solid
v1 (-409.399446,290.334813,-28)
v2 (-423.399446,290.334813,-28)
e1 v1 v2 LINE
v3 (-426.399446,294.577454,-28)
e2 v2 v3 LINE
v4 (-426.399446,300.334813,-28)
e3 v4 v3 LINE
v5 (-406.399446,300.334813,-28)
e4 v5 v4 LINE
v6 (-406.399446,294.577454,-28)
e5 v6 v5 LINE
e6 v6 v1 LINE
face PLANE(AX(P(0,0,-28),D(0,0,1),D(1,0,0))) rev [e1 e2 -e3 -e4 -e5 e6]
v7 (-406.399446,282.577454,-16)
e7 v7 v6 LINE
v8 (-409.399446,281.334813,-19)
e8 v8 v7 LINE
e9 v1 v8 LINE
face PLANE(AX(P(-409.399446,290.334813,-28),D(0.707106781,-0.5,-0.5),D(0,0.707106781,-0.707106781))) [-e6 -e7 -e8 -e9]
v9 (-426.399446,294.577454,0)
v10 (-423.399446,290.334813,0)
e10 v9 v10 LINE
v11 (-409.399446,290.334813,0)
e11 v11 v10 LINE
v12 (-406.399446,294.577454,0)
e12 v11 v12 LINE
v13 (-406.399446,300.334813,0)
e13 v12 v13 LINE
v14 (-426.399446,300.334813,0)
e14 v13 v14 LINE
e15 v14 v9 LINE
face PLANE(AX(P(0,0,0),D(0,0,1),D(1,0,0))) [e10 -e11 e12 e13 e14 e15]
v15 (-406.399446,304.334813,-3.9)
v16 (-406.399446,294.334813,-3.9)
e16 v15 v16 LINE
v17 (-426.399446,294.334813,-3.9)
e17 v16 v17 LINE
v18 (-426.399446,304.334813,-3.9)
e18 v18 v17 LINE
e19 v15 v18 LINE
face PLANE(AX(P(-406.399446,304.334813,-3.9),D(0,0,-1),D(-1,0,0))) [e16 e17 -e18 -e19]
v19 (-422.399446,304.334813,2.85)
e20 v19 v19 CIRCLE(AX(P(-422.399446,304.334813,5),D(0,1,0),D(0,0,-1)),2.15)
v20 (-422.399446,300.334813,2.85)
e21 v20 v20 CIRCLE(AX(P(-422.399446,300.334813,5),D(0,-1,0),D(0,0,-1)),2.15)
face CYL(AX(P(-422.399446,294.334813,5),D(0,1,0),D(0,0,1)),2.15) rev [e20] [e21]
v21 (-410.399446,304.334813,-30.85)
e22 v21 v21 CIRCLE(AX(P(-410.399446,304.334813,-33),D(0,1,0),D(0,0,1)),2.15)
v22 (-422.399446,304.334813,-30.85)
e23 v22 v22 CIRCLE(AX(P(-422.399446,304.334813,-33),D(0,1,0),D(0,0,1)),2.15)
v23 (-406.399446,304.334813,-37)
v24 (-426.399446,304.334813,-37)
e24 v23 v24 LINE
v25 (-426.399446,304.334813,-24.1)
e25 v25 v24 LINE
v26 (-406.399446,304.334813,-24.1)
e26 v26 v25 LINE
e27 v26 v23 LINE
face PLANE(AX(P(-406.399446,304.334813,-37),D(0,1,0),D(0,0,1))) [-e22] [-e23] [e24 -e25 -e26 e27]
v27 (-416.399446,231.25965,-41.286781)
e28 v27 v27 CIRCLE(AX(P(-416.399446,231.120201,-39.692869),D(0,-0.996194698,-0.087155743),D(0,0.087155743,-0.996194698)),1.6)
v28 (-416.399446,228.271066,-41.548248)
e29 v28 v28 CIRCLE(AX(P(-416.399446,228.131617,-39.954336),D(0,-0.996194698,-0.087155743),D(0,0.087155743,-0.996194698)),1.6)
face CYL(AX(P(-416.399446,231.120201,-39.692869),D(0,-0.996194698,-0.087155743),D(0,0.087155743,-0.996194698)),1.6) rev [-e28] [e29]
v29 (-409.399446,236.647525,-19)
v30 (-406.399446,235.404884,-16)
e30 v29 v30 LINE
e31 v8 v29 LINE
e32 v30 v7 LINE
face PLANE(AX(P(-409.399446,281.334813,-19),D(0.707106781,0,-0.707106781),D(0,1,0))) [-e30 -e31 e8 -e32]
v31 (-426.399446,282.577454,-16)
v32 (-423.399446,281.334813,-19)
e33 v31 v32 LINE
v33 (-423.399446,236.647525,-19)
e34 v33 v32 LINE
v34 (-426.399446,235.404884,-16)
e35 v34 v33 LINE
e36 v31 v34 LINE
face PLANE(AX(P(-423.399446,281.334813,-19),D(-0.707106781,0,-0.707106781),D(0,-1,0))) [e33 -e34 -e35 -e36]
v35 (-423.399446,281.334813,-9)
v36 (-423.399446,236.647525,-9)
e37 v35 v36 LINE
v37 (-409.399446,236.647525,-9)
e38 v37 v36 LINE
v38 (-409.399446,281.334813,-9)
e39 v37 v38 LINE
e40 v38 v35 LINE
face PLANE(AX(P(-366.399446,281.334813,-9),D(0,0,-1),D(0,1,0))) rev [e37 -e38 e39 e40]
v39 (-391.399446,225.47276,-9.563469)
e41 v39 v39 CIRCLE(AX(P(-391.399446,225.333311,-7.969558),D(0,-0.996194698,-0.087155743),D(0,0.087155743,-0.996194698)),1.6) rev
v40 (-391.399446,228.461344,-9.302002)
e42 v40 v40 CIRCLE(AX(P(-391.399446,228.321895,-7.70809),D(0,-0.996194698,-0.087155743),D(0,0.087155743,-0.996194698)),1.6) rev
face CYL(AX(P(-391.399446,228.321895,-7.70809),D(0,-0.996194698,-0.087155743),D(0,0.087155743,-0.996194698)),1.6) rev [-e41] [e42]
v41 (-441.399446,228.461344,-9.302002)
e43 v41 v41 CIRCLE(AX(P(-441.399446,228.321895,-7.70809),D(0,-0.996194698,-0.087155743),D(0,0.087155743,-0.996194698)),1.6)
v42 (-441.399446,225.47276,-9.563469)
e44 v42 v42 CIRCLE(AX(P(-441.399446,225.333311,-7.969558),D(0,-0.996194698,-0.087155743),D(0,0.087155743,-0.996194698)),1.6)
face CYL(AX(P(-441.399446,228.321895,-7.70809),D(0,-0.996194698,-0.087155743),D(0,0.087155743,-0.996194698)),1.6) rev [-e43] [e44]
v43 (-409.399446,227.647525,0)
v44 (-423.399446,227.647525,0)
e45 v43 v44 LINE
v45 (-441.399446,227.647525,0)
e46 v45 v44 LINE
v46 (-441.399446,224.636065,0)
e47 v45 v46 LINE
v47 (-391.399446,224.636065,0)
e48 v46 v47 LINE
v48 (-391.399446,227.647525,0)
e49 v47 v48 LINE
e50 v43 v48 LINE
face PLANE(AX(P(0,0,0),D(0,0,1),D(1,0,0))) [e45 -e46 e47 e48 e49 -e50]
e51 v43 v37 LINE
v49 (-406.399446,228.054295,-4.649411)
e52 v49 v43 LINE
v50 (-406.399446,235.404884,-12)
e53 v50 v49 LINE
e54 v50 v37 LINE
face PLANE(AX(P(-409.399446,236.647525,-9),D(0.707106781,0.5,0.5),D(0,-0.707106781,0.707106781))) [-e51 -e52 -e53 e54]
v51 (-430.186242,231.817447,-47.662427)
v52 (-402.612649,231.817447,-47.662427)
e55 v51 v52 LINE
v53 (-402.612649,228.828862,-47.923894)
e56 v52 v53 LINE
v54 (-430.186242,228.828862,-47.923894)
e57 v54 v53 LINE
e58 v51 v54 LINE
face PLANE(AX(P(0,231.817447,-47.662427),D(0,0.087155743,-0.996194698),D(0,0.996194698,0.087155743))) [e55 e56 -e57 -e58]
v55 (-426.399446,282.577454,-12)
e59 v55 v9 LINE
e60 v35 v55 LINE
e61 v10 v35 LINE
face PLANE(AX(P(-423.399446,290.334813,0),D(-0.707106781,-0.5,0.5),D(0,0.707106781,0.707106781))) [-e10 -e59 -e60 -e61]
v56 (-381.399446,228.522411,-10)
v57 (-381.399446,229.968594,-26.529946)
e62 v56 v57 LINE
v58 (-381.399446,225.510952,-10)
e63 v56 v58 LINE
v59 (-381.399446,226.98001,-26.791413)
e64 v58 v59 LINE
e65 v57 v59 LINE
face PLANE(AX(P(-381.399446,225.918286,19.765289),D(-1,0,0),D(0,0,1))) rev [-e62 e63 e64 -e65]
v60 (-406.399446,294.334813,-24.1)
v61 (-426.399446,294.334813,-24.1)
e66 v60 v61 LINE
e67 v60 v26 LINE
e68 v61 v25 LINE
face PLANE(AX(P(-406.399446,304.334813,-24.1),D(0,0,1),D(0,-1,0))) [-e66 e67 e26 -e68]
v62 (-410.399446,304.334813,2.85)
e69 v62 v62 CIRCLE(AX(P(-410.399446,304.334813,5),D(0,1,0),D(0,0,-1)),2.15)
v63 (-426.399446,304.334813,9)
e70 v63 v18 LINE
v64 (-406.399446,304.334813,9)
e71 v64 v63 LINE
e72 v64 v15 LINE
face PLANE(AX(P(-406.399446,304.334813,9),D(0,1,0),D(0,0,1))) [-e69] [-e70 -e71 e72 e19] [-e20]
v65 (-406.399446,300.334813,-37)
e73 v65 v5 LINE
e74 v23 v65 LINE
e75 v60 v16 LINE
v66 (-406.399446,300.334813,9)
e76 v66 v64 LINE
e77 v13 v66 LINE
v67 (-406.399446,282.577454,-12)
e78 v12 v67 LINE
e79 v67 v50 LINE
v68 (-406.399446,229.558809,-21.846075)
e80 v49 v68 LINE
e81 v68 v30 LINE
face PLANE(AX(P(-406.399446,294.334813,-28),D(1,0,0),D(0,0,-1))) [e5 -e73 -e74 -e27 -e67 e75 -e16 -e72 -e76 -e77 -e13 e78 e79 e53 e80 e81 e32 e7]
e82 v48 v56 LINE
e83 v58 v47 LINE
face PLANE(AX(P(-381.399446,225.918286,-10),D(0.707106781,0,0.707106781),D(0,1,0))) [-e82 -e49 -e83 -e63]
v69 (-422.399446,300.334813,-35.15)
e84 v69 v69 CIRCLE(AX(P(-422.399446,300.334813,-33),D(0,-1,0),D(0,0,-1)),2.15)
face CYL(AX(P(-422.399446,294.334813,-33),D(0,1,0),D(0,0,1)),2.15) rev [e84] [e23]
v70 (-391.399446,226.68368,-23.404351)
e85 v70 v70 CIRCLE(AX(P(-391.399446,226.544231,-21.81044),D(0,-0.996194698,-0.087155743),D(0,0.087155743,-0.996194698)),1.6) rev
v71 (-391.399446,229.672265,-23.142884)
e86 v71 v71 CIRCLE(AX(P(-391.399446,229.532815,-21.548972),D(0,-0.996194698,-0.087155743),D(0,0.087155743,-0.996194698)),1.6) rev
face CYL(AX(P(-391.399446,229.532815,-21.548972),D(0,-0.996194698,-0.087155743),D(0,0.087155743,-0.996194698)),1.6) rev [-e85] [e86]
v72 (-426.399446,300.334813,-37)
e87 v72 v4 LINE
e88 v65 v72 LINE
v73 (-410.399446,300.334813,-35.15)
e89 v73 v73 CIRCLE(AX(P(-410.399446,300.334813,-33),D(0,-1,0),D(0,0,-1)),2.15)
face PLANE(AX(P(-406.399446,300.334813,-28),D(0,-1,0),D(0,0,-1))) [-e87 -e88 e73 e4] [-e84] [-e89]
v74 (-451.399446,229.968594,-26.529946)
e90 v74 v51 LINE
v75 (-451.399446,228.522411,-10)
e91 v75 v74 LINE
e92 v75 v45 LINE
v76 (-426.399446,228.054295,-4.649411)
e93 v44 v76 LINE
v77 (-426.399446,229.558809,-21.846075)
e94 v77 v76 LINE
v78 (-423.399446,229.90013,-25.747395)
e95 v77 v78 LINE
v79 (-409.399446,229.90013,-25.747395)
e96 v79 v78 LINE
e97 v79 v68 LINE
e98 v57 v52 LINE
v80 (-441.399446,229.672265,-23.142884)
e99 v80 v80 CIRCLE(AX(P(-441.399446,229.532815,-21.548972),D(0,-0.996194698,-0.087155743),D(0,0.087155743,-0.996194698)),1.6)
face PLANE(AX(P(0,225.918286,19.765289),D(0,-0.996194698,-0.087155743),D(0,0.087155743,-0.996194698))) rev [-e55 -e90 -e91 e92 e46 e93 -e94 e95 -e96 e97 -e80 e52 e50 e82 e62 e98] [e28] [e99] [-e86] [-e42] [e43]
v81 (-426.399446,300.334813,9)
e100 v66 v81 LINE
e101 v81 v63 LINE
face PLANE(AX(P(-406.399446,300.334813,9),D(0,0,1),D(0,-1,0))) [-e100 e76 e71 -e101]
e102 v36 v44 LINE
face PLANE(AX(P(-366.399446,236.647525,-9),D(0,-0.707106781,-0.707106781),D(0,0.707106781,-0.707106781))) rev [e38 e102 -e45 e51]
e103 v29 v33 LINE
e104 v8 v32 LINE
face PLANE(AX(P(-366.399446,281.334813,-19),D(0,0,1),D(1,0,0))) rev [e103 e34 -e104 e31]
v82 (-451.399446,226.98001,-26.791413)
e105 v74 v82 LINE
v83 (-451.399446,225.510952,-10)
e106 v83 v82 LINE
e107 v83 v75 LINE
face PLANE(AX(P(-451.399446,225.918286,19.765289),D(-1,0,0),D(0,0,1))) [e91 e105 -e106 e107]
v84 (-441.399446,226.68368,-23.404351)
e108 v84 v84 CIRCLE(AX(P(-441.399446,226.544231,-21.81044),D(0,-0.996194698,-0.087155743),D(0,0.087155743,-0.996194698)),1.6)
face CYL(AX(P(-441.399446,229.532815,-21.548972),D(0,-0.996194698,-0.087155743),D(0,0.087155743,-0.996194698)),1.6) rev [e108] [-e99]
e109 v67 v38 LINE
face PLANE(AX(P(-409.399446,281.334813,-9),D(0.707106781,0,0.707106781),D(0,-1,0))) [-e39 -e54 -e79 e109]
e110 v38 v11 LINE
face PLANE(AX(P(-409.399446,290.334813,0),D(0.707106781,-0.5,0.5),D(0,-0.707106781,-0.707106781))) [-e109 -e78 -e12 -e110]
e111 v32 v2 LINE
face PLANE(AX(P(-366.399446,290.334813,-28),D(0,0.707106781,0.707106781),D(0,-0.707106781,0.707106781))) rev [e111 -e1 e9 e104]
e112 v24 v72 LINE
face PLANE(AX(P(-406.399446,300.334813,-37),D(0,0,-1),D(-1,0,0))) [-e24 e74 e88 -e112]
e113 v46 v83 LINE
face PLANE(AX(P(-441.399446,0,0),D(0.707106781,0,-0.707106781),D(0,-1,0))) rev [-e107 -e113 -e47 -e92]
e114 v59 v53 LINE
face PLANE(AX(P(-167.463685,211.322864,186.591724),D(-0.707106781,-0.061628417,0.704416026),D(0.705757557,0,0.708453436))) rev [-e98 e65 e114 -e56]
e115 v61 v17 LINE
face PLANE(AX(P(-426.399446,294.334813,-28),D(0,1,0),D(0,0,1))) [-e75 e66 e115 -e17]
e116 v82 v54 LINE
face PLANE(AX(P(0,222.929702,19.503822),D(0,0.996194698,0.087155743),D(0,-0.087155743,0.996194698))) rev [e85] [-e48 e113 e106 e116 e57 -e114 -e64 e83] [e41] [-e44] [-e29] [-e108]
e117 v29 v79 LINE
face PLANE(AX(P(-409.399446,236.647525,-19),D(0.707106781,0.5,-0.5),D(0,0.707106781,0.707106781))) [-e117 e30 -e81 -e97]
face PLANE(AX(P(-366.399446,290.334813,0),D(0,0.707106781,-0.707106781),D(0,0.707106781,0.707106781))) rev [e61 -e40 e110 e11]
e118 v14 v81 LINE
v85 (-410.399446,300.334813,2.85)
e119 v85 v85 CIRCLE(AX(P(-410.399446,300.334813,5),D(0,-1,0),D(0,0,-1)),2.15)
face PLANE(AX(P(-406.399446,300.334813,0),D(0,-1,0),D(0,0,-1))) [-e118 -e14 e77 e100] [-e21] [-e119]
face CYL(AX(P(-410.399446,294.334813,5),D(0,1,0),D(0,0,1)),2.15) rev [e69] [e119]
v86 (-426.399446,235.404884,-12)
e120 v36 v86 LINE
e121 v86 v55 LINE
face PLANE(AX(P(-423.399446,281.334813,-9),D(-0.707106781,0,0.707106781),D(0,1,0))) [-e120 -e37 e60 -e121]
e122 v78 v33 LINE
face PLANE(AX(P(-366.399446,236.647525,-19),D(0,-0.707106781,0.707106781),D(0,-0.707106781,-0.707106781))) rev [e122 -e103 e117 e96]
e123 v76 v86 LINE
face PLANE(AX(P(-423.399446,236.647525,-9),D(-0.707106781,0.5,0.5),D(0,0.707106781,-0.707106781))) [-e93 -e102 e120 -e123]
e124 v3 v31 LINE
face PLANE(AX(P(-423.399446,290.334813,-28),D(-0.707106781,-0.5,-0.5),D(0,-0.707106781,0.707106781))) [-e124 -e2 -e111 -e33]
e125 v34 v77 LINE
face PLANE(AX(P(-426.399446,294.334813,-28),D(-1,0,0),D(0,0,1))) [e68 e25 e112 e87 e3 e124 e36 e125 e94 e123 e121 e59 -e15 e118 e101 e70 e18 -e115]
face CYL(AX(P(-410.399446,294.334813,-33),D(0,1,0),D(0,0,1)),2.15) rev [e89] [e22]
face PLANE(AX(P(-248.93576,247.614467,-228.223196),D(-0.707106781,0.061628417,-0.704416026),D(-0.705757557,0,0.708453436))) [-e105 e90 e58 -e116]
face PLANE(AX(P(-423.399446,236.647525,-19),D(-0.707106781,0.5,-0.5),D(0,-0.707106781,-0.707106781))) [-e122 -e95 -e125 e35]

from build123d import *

# Parameters (mm, degrees)
SKETCH1_W           = 20
SKETCH1_H           = 53.344530479
BOSS_EXTRUDE1_DEPTH = 28
BOSS_EXTRUDE2_START = -426.399445517
BOSS_EXTRUDE2_DEPTH = 20
BOSS_EXTRUDE3_DEPTH = 20
SKETCH4_R           = 2.15
CUT_EXTRUDE1_DEPTH  = 10
SKETCH6_R           = 1.6
BOSS_EXTRUDE5_DEPTH = 3
SKETCH7_W           = 104.374043795
SKETCH7_H           = 16.644454458
CUT_EXTRUDE2_DEPTH  = 3
CHAMFER1_SIZE       = 10
CUT_EXTRUDE3_DEPTH  = 60
CHAMFER2_SIZE       = 3


# Read off the part's stored shape, not the designer's step: Boss-Extrude2
with BuildPart() as part:
    # Sketch1 → Boss-Extrude1 (new body)
    with BuildSketch(Plane.XY):
        with Locations((-416.399445517, 267.662547877)):
            Rectangle(SKETCH1_W, SKETCH1_H)
    extrude(amount=-BOSS_EXTRUDE1_DEPTH)

    # Boss-Extrude2 outline → Boss-Extrude2 (add)
    with BuildSketch(Plane.YZ.offset(BOSS_EXTRUDE2_START)):
        Polygon((227.085747643, -28), (240.990282637, -28), (240.990282637, 0), (224.636065064, 0), align=None)
    extrude(amount=BOSS_EXTRUDE2_DEPTH)

    # Sketch3 → Boss-Extrude3 (add)
    with BuildSketch(Plane.ZY.offset(426.399445517)):
        Polygon((-28, 300.334813116), (-37, 300.334813116), (-37, 304.334813116), (-24.1, 304.334813116), (-24.1, 294.334813116), (-28, 294.334813116), align=None)
        Polygon((9, 300.334813116), (9, 304.334813116), (-3.9, 304.334813116), (-3.9, 294.334813116), (0, 294.334813116), (0, 300.334813116), align=None)
    extrude(amount=-BOSS_EXTRUDE3_DEPTH)

    # Sketch4 → Cut-Extrude1 (cut)
    with BuildSketch(Plane(origin=(0, 304.334813116, 0), x_dir=(1, 0, 0), z_dir=(0, 1, 0))):
        with Locations(Location((-422.399445517, 33, 0), (0, 0, 270))):
            Circle(SKETCH4_R)
        with Locations(Location((-410.399445517, 33, 0), (0, 0, 270))):
            Circle(SKETCH4_R)
        with Locations(Location((-410.399445517, -5, 0), (0, 0, 90))):
            Circle(SKETCH4_R)
        with Locations(Location((-422.399445517, -5, 0), (0, 0, 90))):
            Circle(SKETCH4_R)
    extrude(amount=-CUT_EXTRUDE1_DEPTH, mode=Mode.SUBTRACT)

    # Sketch6 → Boss-Extrude5 (add)
    # profile 1 of 2: a face of its own
    with BuildSketch(Plane(origin=(0, 222.929701773, 19.503821668), x_dir=(1, 0, 0), z_dir=(0, -0.9961946980917453, -0.087155742747662))):
        with BuildLine():
            Line((-426.399445517, -19.578323099), (-451.399445517, -19.578323099))
            Line((-451.399445517, -19.578323099), (-451.399445517, -46.472075114))
            Line((-451.399445517, -46.472075114), (-430.186242082, -67.68527855))
            Line((-430.186242082, -67.68527855), (-416.399445517, -67.68527855))
            Line((-416.399445517, -67.68527855), (-416.399445517, -61.28527855))
            ThreePointArc((-416.399445517, -61.28527855), (-417.999445517, -59.68527855), (-416.399445517, -58.08527855))
            Line((-416.399445517, -58.08527855), (-416.399445517, -47.68527855))
            Line((-416.399445517, -47.68527855), (-426.399445517, -47.68527855))
            Line((-426.399445517, -47.68527855), (-426.399445517, -19.578323099))
        make_face()
        with Locations(Location((-441.399445517, -41.472075114, 0), (0, 0, 270))):
            Circle(SKETCH6_R, mode=Mode.SUBTRACT)
        with Locations(Location((-441.399445517, -27.578323099, 0), (0, 0, 270))):
            Circle(SKETCH6_R, mode=Mode.SUBTRACT)
    # profile 2 of 2: a face of its own
    with BuildSketch(Plane(origin=(0, 222.929701773, 19.503821668), x_dir=(1, 0, 0), z_dir=(0, -0.9961946980917453, -0.087155742747662))):
        with BuildLine():
            Line((-416.399445517, -61.28527855), (-416.399445517, -67.68527855))
            Line((-416.399445517, -67.68527855), (-402.612648953, -67.68527855))
            Line((-402.612648953, -67.68527855), (-381.399445517, -46.472075114))
            Line((-381.399445517, -46.472075114), (-381.399445517, -19.578323099))
            Line((-381.399445517, -19.578323099), (-406.399445517, -19.578323099))
            Line((-406.399445517, -19.578323099), (-406.399445517, -47.68527855))
            Line((-406.399445517, -47.68527855), (-416.399445517, -47.68527855))
            Line((-416.399445517, -47.68527855), (-416.399445517, -58.08527855))
            ThreePointArc((-416.399445517, -58.08527855), (-415.268074667, -58.5539077), (-414.799445517, -59.68527855))
            ThreePointArc((-414.799445517, -59.68527855), (-415.268074667, -60.8166494), (-416.399445517, -61.28527855))
        make_face()
        with Locations(Location((-391.399445517, -41.472075114, 0), (0, 0, 270))):
            Circle(SKETCH6_R, mode=Mode.SUBTRACT)
        with Locations(Location((-391.399445517, -27.578323099, 0), (0, 0, 270))):
            Circle(SKETCH6_R, mode=Mode.SUBTRACT)
    extrude(amount=-BOSS_EXTRUDE5_DEPTH)

    # Sketch7 → Cut-Extrude2 (cut)
    with BuildSketch(Plane.XY):
        with Locations((-415.627785026, 222.829224709)):
            Rectangle(SKETCH7_W, SKETCH7_H)
    extrude(amount=CUT_EXTRUDE2_DEPTH, mode=Mode.SUBTRACT)

    # Chamfer1
    chamfer1_edges = [part.edges().sort_by_distance(p)[0] for p in [
        (-451.399445517, 226.141794821, 0),
        (-381.399445517, 226.141794821, 0),
    ]]
    chamfer(chamfer1_edges, length=CHAMFER1_SIZE)

    # Sketch8 → Cut-Extrude3 (cut)
    with BuildSketch(Plane.ZY.offset(426.399445517)):
        Polygon((-28, 290.334813116), (-19, 281.334813116), (-19, 236.647524577), (-25.747394836, 229.90012974), (-28, 230.097207156), align=None)
        Polygon((0, 290.334813116), (-9, 281.334813116), (-9, 236.647524577), (0, 227.647524577), align=None)
    extrude(amount=-CUT_EXTRUDE3_DEPTH, mode=Mode.SUBTRACT)

    # Chamfer2
    chamfer2_edges = [part.edges().sort_by_distance(p)[0] for p in [
        (-406.399445517, 258.991168846, -9),
        (-406.399445517, 258.991168846, -19),
        (-406.399445517, 285.834813116, -23.5),
        (-406.399445517, 233.273827159, -22.373697418),
        (-426.399445517, 233.273827159, -22.373697418),
        (-426.399445517, 258.991168846, -19),
        (-426.399445517, 285.834813116, -23.5),
        (-406.399445517, 285.834813116, -4.5),
        (-406.399445517, 232.147524577, -4.5),
        (-426.399445517, 285.834813116, -4.5),
        (-426.399445517, 258.991168846, -9),
        (-426.399445517, 232.147524577, -4.5),
    ]]
    chamfer(chamfer2_edges, length=CHAMFER2_SIZE)


solid = part.part
